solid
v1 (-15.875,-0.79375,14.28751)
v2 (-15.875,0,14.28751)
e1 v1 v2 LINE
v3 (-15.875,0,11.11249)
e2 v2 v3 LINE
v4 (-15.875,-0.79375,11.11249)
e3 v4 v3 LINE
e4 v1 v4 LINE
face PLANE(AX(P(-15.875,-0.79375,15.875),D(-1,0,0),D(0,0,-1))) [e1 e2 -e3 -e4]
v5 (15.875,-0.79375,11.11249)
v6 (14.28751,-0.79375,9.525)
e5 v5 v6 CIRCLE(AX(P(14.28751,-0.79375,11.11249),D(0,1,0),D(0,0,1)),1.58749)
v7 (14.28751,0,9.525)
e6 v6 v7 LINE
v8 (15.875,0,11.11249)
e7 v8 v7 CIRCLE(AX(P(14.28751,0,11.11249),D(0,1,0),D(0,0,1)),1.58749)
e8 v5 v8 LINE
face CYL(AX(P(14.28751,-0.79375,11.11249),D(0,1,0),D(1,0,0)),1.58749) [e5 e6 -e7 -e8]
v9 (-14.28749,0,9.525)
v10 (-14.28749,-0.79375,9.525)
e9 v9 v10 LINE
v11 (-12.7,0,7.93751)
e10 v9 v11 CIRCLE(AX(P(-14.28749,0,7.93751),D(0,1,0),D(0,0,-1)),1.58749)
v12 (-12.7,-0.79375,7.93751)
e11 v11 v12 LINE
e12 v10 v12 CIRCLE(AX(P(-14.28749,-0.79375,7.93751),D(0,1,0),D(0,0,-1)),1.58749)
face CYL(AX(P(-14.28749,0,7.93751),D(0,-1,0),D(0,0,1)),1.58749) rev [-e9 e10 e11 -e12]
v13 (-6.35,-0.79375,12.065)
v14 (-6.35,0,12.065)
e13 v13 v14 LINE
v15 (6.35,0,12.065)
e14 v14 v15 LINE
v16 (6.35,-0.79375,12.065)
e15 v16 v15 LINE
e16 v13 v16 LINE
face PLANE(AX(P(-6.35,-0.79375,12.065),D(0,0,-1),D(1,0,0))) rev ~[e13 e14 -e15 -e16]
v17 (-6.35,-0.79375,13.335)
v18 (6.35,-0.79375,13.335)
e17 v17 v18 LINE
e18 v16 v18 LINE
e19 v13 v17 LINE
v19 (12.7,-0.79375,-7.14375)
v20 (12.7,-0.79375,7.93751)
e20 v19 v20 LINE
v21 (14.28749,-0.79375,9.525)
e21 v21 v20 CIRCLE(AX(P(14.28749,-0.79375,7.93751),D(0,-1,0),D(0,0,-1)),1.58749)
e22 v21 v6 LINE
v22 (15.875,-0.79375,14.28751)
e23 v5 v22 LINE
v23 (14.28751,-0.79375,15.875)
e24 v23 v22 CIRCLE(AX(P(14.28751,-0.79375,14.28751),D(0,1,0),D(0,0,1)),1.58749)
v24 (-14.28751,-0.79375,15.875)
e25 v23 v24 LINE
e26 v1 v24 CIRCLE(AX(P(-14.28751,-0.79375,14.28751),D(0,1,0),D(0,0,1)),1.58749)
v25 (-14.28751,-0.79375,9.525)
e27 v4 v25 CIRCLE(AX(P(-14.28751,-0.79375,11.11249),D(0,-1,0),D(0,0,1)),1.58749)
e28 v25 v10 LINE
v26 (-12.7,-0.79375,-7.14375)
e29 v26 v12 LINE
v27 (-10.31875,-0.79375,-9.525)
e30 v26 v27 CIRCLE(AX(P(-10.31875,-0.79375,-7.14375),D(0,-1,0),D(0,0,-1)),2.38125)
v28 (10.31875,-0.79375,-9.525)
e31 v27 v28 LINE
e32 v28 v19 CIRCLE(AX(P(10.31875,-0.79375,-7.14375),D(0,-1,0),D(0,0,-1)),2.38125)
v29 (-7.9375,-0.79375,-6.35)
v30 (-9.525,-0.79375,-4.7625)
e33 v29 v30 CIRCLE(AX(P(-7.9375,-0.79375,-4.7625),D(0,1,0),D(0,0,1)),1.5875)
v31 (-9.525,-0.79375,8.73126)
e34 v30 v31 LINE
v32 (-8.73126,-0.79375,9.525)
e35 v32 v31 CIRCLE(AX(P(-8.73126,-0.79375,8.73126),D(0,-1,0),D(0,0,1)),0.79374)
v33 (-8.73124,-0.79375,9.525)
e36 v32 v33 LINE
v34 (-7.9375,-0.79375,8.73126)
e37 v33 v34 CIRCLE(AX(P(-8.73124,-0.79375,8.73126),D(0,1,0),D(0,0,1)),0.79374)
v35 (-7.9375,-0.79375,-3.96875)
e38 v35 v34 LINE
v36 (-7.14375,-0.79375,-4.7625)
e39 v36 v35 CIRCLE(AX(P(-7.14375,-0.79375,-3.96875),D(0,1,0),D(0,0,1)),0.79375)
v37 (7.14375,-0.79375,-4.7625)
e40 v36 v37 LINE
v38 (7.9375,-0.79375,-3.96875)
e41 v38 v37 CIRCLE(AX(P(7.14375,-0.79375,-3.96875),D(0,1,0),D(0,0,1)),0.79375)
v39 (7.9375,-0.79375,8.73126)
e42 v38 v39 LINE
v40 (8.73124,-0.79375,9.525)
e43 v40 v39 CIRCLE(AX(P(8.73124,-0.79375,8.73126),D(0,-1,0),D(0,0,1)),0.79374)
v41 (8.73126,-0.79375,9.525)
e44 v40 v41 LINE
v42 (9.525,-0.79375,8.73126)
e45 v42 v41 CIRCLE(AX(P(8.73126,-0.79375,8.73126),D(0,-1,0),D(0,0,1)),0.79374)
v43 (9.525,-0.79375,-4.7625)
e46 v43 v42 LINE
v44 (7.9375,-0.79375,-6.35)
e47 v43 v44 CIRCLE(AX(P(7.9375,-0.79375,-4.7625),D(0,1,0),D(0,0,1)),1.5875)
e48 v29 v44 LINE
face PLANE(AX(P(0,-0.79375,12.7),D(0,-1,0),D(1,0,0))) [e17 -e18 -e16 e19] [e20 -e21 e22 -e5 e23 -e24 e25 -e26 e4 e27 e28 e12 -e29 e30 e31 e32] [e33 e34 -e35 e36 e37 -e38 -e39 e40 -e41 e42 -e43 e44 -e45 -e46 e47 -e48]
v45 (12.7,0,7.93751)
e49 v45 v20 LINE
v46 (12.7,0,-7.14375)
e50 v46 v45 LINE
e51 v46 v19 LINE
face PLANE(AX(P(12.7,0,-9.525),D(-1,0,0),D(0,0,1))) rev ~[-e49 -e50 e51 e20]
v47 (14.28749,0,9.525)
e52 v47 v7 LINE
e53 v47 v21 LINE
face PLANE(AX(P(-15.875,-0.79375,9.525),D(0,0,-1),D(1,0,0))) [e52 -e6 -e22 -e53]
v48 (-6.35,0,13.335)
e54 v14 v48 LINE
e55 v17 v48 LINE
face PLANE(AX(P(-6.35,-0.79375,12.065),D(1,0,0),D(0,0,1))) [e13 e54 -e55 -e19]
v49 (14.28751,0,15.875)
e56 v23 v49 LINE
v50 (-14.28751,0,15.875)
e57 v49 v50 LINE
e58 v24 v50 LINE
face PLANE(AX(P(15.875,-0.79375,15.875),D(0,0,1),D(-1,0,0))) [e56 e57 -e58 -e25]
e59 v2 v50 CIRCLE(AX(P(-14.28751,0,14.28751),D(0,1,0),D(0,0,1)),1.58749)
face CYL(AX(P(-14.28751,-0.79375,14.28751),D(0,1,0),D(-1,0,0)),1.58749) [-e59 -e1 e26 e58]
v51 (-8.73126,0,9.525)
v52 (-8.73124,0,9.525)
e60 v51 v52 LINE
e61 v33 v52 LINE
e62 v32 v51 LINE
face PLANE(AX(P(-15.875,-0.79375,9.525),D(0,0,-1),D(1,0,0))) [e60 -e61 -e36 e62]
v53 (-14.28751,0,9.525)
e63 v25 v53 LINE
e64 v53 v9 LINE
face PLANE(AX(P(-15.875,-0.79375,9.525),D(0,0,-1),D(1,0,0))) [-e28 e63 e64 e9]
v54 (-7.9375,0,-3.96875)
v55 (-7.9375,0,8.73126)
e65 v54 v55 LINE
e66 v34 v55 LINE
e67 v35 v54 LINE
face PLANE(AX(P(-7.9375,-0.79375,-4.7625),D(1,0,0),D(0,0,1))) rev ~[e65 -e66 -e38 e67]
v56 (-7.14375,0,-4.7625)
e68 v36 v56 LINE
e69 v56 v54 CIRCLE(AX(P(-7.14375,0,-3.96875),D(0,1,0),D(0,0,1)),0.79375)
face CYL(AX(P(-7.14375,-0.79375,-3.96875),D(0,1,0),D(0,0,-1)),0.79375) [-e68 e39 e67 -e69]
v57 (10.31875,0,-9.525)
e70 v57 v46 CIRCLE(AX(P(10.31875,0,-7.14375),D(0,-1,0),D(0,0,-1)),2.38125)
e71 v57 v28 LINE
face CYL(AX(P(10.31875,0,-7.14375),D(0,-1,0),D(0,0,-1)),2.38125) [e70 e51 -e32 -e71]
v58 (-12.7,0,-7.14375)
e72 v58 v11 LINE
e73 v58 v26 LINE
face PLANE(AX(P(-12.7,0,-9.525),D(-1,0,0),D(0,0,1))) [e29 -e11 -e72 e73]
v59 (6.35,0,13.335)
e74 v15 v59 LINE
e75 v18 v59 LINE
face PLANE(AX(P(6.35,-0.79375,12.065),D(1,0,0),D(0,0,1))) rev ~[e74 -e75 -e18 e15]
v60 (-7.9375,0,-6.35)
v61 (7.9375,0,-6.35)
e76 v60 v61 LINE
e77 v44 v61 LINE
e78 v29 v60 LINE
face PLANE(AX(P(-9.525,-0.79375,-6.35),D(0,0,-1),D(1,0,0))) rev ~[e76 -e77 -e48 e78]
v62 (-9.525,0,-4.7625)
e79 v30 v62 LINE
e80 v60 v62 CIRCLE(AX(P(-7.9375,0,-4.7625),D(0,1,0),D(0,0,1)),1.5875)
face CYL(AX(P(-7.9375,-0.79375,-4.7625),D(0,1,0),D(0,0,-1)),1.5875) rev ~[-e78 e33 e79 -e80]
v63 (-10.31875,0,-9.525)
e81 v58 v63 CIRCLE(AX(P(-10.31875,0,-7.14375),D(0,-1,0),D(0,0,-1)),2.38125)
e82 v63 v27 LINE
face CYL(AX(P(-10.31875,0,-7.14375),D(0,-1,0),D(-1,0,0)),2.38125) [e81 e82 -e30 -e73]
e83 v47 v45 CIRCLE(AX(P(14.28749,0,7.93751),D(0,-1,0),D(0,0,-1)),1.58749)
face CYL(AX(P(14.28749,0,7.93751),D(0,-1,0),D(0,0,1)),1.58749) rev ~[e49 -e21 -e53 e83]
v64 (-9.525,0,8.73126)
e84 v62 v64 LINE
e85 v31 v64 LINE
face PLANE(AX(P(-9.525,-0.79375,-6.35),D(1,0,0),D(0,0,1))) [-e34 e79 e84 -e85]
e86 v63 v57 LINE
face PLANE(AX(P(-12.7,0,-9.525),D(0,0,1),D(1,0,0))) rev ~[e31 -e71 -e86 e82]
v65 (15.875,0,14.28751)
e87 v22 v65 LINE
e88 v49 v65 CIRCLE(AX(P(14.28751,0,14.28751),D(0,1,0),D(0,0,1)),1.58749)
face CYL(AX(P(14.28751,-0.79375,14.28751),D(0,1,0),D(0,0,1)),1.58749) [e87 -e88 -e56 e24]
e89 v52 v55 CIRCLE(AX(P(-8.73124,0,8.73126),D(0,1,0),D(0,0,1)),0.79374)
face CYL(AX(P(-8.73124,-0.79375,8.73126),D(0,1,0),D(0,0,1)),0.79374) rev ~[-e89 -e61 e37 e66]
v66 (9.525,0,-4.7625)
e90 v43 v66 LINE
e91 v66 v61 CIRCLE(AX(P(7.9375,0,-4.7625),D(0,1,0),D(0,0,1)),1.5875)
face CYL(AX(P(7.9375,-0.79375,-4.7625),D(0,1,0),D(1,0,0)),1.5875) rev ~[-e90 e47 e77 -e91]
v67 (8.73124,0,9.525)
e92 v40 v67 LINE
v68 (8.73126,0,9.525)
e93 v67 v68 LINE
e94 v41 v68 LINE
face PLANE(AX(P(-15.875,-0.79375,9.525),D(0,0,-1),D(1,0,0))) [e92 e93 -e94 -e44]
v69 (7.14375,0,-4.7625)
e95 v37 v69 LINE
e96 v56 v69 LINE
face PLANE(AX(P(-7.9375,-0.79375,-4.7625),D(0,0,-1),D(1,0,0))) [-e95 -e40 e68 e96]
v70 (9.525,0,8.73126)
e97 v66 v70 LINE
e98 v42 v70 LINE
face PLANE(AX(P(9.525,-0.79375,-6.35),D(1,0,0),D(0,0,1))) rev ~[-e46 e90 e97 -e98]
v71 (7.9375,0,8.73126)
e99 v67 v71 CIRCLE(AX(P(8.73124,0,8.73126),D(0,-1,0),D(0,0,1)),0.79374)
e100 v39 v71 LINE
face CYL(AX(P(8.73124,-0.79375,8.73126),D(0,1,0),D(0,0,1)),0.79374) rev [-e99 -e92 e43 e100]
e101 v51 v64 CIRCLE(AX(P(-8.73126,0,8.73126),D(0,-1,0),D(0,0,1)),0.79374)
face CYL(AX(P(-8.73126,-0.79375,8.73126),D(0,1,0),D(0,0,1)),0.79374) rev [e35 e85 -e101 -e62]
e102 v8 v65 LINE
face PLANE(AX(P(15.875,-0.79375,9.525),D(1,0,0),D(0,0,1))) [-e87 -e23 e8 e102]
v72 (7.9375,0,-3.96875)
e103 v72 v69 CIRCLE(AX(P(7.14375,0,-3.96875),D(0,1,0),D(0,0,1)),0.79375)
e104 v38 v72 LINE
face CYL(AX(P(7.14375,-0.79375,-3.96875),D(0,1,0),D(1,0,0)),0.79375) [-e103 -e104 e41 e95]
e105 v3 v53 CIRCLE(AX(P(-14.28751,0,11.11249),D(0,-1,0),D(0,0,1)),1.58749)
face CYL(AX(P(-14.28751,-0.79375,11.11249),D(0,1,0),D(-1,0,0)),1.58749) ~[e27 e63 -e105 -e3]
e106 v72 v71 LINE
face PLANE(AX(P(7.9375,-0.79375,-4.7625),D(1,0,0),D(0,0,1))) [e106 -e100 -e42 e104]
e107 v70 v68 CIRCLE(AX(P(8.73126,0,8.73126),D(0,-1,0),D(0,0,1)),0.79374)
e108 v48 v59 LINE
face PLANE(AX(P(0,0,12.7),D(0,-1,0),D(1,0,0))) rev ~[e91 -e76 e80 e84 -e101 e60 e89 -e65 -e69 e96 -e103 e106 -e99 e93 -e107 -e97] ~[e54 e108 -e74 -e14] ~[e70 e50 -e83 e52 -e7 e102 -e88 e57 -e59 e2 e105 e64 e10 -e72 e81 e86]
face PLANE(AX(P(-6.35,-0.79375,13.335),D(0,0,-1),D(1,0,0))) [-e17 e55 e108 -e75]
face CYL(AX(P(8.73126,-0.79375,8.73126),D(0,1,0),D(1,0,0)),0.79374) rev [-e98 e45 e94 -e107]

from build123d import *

# Parameters (mm, degrees)
F0_W      = 25.4
F0_H      = 19.05
F1_DEPTH  = 0.79375
F2_R      = 2.38125
F3_W      = 19.05
F3_H      = 15.875
F4_DEPTH  = 4.9276
F5_W      = 12.7
F5_H      = 1.27
F6_DEPTH  = 0.79375
F7_R      = 1.58749
F8_R      = 1.5875
F9_W      = 12.7
F9_H      = 1.27
F9_W_2    = 15.875
F9_H_2    = 14.2875
F10_DEPTH = 0.79375
F11_R     = 0.79374
F12_R     = 0.79375


# Not quite as in the source:
# - a fillet or chamfer is up to 0.001 mm smaller than in the source, because OpenCascade refuses the exact size
# - ends of sketch curves that miss each other by under 0.0002 mm in the source are joined


with BuildPart() as f1:
    # F0 (on Front) → F1 (new body)
    with BuildSketch(Plane.XZ):
        Rectangle(F0_W, F0_H)
    extrude(amount=F1_DEPTH)

    # F2
    f2_edges = [f1.edges().sort_by_distance(p)[0] for p in [
        (12.7, -0.396875, -9.525),
        (-12.7, -0.396875, -9.525),
    ]]
    fillet(f2_edges, radius=F2_R)

    # F3 (on face) → F4 (cut)
    with BuildSketch(Plane.XZ.offset(0.79375)):
        with Locations((0, 1.5875)):
            Rectangle(F3_W, F3_H)
    extrude(amount=-F4_DEPTH, mode=Mode.SUBTRACT)

    # F5 (on face) → F6 (join)
    with BuildSketch(Plane.XZ.offset(0.79375)):
        Polygon((-15.875, 15.875), (-15.875, 9.525), (-12.7, 9.525), (-9.525, 9.525), (9.525, 9.525), (12.7, 9.525), (15.875, 9.525), (15.875, 15.875), align=None)
        with Locations((0, 12.7)):
            Rectangle(F5_W, F5_H, mode=Mode.SUBTRACT)
    extrude(amount=-F6_DEPTH)

    # F7 (radius 1.5875 in the source; OpenCascade refuses exactly that, so slightly less here)
    f7_edges = [f1.edges().sort_by_distance(p)[0] for p in [
        (-15.875, -0.396875, 15.875),
        (15.875, -0.396875, 15.875),
        (15.875, -0.396875, 9.525),
        (12.7, -0.396875, 9.525),
        (-15.875, -0.396875, 9.525),
        (-12.7, -0.396875, 9.525),
    ]]
    fillet(f7_edges, radius=F7_R)

    # F8
    f8_edges = [f1.edges().sort_by_distance(p)[0] for p in [
        (-9.525, -0.396875, -6.35),
        (9.525, -0.396875, -6.35),
    ]]
    fillet(f8_edges, radius=F8_R)

    # F9 (on face) → F10 (join)
    with BuildSketch(Plane.XZ.offset(0.79375)):
        with BuildLine():
            ThreePointArc((-14.28751, 15.875), (-15.4100349441, 15.4100349441), (-15.875, 14.28751))
            Line((-15.875, 14.28751), (-15.875, 11.11249))
            ThreePointArc((-15.875, 11.11249), (-15.4100349441, 9.9899650559), (-14.28751, 9.525))
            ThreePointArc((-14.28751, 9.525), (-13.1649650559, 9.0600349441), (-12.7, 7.93751))
            Line((-12.7, 7.93751), (-12.7, -7.14375))
            ThreePointArc((-12.7, -7.14375), (-12.0025480227, -8.8275480227), (-10.31875, -9.525))
            Line((-10.31875, -9.525), (10.31875, -9.525))
            ThreePointArc((10.31875, -9.525), (12.0025480227, -8.8275480227), (12.7, -7.14375))
            Line((12.7, -7.14375), (12.7, 7.93751))
            ThreePointArc((12.7, 7.93751), (13.1649650559, 9.0600349441), (14.28749, 9.525))
            ThreePointArc((14.28749, 9.525), (15.4100349441, 9.9899650559), (15.875, 11.11249))
            Line((15.875, 11.11249), (15.875, 14.28751))
            ThreePointArc((15.875, 14.28751), (15.4100349441, 15.4100349441), (14.28751, 15.875))
            Line((14.28751, 15.875), (-14.28751, 15.875))
        make_face()
        with BuildLine():
            Line((-9.525, 9.525), (-7.9375, 9.525))
            Line((-7.9375, 9.525), (7.9375, 9.525))
            Line((7.9375, 9.525), (9.525, 9.525))
            Line((9.525, 9.525), (9.525, -4.7625))
            ThreePointArc((9.525, -4.7625), (9.0600320151, -5.8850320151), (7.9375, -6.35))
            Line((7.9375, -6.35), (-7.9375, -6.35))
            ThreePointArc((-7.9375, -6.35), (-9.0600320151, -5.8850320151), (-9.525, -4.7625))
            Line((-9.525, -4.7625), (-9.525, 9.525))
        make_face(mode=Mode.SUBTRACT)
        with Locations((0, 12.7)):
            Rectangle(F9_W, F9_H, mode=Mode.SUBTRACT)
        with Locations((0, 2.38125)):
            Rectangle(F9_W_2, F9_H_2)
    extrude(amount=-F10_DEPTH)

    # F11 (radius 0.79375 in the source; OpenCascade refuses exactly that, so slightly less here)
    f11_edges = [f1.edges().sort_by_distance(p)[0] for p in [
        (-7.9375, -0.396875, 9.525),
        (-9.525, -0.396875, 9.525),
        (7.9375, -0.396875, 9.525),
        (9.525, -0.396875, 9.525),
    ]]
    fillet(f11_edges, radius=F11_R)

    # F12
    f12_edges = [f1.edges().sort_by_distance(p)[0] for p in [
        (-7.9375, -0.396875, -4.7625),
        (7.9375, -0.396875, -4.7625),
    ]]
    fillet(f12_edges, radius=F12_R)


solid = f1.part
